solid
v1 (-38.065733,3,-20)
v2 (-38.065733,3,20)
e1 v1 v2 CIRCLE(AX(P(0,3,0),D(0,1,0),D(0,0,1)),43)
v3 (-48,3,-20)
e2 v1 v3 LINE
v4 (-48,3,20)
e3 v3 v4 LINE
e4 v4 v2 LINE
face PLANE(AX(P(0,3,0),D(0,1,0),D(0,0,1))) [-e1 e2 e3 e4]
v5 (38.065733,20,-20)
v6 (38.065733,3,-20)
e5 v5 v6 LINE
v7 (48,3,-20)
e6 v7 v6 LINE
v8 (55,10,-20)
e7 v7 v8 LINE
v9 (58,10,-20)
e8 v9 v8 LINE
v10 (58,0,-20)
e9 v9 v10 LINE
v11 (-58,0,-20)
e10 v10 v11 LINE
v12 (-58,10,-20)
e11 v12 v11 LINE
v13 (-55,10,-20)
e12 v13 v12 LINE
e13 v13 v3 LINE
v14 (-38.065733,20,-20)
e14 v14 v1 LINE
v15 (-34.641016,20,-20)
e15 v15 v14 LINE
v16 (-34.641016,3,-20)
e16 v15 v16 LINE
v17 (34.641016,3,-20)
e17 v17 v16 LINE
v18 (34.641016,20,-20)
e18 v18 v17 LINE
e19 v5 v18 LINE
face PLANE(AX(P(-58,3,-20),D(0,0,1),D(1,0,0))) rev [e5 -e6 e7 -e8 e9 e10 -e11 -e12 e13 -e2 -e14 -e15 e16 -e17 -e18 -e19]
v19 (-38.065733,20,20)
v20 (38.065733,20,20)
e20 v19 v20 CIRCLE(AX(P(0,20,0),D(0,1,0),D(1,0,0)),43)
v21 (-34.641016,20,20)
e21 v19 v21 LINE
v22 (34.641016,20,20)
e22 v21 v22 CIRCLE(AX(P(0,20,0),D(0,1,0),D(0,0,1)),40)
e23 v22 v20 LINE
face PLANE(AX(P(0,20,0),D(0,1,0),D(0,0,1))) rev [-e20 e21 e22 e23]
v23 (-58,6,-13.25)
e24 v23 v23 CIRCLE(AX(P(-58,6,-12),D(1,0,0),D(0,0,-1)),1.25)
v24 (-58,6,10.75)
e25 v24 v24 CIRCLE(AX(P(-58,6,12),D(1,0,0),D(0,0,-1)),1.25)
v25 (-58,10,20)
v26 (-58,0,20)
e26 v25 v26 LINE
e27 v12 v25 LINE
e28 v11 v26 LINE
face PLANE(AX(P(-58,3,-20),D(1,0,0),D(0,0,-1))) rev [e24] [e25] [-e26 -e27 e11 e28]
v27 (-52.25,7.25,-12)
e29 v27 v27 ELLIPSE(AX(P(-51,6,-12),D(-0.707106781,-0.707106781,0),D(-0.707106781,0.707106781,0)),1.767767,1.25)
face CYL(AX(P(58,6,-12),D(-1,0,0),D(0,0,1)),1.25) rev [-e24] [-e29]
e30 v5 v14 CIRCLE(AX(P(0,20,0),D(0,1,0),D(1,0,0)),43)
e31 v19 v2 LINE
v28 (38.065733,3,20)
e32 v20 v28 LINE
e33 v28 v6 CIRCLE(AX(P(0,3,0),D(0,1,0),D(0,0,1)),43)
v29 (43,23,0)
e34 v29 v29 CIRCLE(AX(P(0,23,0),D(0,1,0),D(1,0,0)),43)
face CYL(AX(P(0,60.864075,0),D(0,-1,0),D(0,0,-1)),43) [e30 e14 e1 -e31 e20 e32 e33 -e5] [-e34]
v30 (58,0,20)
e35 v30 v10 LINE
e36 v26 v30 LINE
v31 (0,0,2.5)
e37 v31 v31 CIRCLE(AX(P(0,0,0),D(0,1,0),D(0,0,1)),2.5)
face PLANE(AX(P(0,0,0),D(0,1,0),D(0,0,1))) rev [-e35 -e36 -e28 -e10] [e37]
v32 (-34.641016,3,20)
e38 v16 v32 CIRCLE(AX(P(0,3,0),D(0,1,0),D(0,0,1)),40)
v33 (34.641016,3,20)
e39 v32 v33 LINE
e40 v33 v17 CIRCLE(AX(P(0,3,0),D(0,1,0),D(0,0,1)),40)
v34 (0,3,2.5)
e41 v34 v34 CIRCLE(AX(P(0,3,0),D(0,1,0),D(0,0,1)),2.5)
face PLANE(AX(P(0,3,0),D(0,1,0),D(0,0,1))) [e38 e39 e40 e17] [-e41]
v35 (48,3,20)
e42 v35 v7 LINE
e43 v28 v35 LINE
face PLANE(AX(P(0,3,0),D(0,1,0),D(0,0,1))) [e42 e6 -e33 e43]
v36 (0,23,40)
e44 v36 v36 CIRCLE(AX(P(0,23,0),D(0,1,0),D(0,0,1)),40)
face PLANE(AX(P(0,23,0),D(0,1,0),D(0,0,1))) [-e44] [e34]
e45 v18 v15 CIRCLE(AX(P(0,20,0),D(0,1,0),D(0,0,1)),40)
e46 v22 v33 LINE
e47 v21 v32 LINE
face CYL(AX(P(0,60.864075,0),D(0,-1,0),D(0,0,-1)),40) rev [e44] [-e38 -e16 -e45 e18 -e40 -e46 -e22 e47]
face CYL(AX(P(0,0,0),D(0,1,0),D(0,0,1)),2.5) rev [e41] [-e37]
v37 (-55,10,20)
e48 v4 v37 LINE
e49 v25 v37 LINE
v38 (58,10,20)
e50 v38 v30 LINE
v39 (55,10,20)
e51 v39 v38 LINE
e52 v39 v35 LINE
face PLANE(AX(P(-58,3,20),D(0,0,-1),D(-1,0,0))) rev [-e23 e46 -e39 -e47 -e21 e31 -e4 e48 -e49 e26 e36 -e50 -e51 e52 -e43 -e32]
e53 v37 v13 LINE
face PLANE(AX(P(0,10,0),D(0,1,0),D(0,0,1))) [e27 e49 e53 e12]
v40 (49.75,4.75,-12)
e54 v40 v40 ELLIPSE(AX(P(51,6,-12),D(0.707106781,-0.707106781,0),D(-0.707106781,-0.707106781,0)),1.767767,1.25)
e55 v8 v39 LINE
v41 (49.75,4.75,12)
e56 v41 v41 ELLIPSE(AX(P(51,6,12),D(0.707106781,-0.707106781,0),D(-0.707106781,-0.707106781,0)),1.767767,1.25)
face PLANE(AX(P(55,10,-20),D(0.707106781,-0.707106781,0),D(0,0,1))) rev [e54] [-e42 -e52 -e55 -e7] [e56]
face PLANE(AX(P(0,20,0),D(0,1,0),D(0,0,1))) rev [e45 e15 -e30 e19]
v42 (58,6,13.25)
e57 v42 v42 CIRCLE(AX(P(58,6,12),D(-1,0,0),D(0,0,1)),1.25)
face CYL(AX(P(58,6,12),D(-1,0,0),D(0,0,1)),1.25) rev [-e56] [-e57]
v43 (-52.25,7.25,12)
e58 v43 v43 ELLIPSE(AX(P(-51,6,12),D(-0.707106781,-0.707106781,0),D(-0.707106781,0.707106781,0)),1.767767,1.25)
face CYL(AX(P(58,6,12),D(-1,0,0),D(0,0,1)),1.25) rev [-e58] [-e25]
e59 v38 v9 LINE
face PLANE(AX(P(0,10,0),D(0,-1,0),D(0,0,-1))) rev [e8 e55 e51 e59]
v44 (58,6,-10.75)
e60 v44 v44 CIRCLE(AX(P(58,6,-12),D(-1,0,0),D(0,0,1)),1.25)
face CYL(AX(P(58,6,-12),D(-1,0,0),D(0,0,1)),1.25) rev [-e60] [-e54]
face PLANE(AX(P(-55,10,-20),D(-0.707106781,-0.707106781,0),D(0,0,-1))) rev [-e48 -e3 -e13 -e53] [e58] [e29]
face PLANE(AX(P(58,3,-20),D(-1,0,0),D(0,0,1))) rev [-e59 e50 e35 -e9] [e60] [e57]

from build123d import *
from build123d.topology import SkipClean

# Parameters (mm, degrees)
SKETCH_1_W               = 116
SKETCH_1_H               = 40
EXTRUDE_1_DEPTH          = 3
SKETCH_2_R               = 2.5
CUT_EXTRUDE_1_DEPTH      = 3
SKETCH_3_W               = 3
SKETCH_3_H               = 40
EXTRUDE_2_DEPTH          = 7
CHAMFER_1_SIZE           = 7
CUT_EXTRUDE_2_DEPTH      = 119.135515405
CUT_EXTRUDE_2_DEPTH_BACK = 119.135515405
SKETCH_4_R               = 1.25
SKETCH_6_R               = 43
SKETCH_6_R_2             = 40
EXTRUDE_1_2_DEPTH        = 3
EXTRUDE_3_DEPTH          = 17


with BuildPart() as part:
    # 草图1 → Extrude 1 (new body)
    with BuildSketch(Plane(origin=(0, 0, 0), x_dir=(1, 0, 0), z_dir=(0, 1, 0))):
        Rectangle(SKETCH_1_W, SKETCH_1_H)
    extrude(amount=EXTRUDE_1_DEPTH)

    # 草图2 → 切除-拉伸1 (cut)
    with BuildSketch(Plane(origin=(0, 3, 0), x_dir=(1, 0, 0), z_dir=(0, 1, 0))):
        with Locations(Location((0, 0, 0), (0, 0, 270))):
            Circle(SKETCH_2_R)
    extrude(amount=-CUT_EXTRUDE_1_DEPTH, mode=Mode.SUBTRACT)

    # 草图3 → 凸台-拉伸2 (add)
    with BuildSketch(Plane(origin=(0, 3, 0), x_dir=(1, 0, 0), z_dir=(0, 1, 0))):
        with Locations((-56.5, 0)):
            Rectangle(SKETCH_3_W, SKETCH_3_H)
        with Locations((56.5, 0)):
            Rectangle(SKETCH_3_W, SKETCH_3_H)
    extrude(amount=EXTRUDE_2_DEPTH)

    # 倒角1
    chamfer_1_edges = [part.edges().sort_by_distance(p)[0] for p in [
        (-55, 3, 0),
        (55, 3, 0),
    ]]
    chamfer(chamfer_1_edges, length=CHAMFER_1_SIZE - 0.0001)  # a hair under: the kernel refuses the full size

    # 草图4 → 切除-拉伸2 (cut, two sides: drawn at the far end of the back side and taken through both)
    with BuildSketch(Plane.ZY.offset(58).offset(-CUT_EXTRUDE_2_DEPTH_BACK)):
        with Locations((-12, 6)):
            Circle(SKETCH_4_R)
        with Locations((12, 6)):
            Circle(SKETCH_4_R)
    extrude(amount=CUT_EXTRUDE_2_DEPTH + CUT_EXTRUDE_2_DEPTH_BACK, mode=Mode.SUBTRACT)



with BuildPart() as body_2:
    # 草图6 → Extrude 1 2 (new body)
    with BuildSketch(Plane(origin=(0, 23, 0), x_dir=(1, 0, 0), z_dir=(0, 1, 0))):
        Circle(SKETCH_6_R)
        Circle(SKETCH_6_R_2, mode=Mode.SUBTRACT)
    extrude(amount=-EXTRUDE_1_2_DEPTH)


with BuildPart() as part_1:
    with SkipClean():  # the faces are left unmerged after this step: merging them gives an invalid solid
        add(part.part)

        add(body_2.part)  # 凸台-拉伸3 merges body 2
        # 草图7 → 凸台-拉伸3 (add)
        with BuildSketch(Plane(origin=(0, 3, 0), x_dir=(1, 0, 0), z_dir=(0, 1, 0))):
            with BuildLine():
                Line((-34.641016151, 20), (-38.065732621, 20))
                ThreePointArc((-38.065732621, 20), (-43, 0), (-38.065732621, -20))
                Line((-38.065732621, -20), (-34.641016151, -20))
                ThreePointArc((-34.641016151, -20), (-40, 0), (-34.641016151, 20))
            make_face()
            with BuildLine():
                ThreePointArc((43, 0), (41.748212553, 10.299842166), (38.065732621, 20))
                Line((38.065732621, 20), (34.641016151, 20))
                ThreePointArc((34.641016151, 20), (38.637033052, 10.352761804), (40, 0))
                ThreePointArc((40, 0), (38.637033052, -10.352761804), (34.641016151, -20))
                Line((34.641016151, -20), (38.065732621, -20))
                ThreePointArc((38.065732621, -20), (41.748212553, -10.299842166), (43, 0))
            make_face()
        extrude(amount=EXTRUDE_3_DEPTH)


solid = part_1.part
